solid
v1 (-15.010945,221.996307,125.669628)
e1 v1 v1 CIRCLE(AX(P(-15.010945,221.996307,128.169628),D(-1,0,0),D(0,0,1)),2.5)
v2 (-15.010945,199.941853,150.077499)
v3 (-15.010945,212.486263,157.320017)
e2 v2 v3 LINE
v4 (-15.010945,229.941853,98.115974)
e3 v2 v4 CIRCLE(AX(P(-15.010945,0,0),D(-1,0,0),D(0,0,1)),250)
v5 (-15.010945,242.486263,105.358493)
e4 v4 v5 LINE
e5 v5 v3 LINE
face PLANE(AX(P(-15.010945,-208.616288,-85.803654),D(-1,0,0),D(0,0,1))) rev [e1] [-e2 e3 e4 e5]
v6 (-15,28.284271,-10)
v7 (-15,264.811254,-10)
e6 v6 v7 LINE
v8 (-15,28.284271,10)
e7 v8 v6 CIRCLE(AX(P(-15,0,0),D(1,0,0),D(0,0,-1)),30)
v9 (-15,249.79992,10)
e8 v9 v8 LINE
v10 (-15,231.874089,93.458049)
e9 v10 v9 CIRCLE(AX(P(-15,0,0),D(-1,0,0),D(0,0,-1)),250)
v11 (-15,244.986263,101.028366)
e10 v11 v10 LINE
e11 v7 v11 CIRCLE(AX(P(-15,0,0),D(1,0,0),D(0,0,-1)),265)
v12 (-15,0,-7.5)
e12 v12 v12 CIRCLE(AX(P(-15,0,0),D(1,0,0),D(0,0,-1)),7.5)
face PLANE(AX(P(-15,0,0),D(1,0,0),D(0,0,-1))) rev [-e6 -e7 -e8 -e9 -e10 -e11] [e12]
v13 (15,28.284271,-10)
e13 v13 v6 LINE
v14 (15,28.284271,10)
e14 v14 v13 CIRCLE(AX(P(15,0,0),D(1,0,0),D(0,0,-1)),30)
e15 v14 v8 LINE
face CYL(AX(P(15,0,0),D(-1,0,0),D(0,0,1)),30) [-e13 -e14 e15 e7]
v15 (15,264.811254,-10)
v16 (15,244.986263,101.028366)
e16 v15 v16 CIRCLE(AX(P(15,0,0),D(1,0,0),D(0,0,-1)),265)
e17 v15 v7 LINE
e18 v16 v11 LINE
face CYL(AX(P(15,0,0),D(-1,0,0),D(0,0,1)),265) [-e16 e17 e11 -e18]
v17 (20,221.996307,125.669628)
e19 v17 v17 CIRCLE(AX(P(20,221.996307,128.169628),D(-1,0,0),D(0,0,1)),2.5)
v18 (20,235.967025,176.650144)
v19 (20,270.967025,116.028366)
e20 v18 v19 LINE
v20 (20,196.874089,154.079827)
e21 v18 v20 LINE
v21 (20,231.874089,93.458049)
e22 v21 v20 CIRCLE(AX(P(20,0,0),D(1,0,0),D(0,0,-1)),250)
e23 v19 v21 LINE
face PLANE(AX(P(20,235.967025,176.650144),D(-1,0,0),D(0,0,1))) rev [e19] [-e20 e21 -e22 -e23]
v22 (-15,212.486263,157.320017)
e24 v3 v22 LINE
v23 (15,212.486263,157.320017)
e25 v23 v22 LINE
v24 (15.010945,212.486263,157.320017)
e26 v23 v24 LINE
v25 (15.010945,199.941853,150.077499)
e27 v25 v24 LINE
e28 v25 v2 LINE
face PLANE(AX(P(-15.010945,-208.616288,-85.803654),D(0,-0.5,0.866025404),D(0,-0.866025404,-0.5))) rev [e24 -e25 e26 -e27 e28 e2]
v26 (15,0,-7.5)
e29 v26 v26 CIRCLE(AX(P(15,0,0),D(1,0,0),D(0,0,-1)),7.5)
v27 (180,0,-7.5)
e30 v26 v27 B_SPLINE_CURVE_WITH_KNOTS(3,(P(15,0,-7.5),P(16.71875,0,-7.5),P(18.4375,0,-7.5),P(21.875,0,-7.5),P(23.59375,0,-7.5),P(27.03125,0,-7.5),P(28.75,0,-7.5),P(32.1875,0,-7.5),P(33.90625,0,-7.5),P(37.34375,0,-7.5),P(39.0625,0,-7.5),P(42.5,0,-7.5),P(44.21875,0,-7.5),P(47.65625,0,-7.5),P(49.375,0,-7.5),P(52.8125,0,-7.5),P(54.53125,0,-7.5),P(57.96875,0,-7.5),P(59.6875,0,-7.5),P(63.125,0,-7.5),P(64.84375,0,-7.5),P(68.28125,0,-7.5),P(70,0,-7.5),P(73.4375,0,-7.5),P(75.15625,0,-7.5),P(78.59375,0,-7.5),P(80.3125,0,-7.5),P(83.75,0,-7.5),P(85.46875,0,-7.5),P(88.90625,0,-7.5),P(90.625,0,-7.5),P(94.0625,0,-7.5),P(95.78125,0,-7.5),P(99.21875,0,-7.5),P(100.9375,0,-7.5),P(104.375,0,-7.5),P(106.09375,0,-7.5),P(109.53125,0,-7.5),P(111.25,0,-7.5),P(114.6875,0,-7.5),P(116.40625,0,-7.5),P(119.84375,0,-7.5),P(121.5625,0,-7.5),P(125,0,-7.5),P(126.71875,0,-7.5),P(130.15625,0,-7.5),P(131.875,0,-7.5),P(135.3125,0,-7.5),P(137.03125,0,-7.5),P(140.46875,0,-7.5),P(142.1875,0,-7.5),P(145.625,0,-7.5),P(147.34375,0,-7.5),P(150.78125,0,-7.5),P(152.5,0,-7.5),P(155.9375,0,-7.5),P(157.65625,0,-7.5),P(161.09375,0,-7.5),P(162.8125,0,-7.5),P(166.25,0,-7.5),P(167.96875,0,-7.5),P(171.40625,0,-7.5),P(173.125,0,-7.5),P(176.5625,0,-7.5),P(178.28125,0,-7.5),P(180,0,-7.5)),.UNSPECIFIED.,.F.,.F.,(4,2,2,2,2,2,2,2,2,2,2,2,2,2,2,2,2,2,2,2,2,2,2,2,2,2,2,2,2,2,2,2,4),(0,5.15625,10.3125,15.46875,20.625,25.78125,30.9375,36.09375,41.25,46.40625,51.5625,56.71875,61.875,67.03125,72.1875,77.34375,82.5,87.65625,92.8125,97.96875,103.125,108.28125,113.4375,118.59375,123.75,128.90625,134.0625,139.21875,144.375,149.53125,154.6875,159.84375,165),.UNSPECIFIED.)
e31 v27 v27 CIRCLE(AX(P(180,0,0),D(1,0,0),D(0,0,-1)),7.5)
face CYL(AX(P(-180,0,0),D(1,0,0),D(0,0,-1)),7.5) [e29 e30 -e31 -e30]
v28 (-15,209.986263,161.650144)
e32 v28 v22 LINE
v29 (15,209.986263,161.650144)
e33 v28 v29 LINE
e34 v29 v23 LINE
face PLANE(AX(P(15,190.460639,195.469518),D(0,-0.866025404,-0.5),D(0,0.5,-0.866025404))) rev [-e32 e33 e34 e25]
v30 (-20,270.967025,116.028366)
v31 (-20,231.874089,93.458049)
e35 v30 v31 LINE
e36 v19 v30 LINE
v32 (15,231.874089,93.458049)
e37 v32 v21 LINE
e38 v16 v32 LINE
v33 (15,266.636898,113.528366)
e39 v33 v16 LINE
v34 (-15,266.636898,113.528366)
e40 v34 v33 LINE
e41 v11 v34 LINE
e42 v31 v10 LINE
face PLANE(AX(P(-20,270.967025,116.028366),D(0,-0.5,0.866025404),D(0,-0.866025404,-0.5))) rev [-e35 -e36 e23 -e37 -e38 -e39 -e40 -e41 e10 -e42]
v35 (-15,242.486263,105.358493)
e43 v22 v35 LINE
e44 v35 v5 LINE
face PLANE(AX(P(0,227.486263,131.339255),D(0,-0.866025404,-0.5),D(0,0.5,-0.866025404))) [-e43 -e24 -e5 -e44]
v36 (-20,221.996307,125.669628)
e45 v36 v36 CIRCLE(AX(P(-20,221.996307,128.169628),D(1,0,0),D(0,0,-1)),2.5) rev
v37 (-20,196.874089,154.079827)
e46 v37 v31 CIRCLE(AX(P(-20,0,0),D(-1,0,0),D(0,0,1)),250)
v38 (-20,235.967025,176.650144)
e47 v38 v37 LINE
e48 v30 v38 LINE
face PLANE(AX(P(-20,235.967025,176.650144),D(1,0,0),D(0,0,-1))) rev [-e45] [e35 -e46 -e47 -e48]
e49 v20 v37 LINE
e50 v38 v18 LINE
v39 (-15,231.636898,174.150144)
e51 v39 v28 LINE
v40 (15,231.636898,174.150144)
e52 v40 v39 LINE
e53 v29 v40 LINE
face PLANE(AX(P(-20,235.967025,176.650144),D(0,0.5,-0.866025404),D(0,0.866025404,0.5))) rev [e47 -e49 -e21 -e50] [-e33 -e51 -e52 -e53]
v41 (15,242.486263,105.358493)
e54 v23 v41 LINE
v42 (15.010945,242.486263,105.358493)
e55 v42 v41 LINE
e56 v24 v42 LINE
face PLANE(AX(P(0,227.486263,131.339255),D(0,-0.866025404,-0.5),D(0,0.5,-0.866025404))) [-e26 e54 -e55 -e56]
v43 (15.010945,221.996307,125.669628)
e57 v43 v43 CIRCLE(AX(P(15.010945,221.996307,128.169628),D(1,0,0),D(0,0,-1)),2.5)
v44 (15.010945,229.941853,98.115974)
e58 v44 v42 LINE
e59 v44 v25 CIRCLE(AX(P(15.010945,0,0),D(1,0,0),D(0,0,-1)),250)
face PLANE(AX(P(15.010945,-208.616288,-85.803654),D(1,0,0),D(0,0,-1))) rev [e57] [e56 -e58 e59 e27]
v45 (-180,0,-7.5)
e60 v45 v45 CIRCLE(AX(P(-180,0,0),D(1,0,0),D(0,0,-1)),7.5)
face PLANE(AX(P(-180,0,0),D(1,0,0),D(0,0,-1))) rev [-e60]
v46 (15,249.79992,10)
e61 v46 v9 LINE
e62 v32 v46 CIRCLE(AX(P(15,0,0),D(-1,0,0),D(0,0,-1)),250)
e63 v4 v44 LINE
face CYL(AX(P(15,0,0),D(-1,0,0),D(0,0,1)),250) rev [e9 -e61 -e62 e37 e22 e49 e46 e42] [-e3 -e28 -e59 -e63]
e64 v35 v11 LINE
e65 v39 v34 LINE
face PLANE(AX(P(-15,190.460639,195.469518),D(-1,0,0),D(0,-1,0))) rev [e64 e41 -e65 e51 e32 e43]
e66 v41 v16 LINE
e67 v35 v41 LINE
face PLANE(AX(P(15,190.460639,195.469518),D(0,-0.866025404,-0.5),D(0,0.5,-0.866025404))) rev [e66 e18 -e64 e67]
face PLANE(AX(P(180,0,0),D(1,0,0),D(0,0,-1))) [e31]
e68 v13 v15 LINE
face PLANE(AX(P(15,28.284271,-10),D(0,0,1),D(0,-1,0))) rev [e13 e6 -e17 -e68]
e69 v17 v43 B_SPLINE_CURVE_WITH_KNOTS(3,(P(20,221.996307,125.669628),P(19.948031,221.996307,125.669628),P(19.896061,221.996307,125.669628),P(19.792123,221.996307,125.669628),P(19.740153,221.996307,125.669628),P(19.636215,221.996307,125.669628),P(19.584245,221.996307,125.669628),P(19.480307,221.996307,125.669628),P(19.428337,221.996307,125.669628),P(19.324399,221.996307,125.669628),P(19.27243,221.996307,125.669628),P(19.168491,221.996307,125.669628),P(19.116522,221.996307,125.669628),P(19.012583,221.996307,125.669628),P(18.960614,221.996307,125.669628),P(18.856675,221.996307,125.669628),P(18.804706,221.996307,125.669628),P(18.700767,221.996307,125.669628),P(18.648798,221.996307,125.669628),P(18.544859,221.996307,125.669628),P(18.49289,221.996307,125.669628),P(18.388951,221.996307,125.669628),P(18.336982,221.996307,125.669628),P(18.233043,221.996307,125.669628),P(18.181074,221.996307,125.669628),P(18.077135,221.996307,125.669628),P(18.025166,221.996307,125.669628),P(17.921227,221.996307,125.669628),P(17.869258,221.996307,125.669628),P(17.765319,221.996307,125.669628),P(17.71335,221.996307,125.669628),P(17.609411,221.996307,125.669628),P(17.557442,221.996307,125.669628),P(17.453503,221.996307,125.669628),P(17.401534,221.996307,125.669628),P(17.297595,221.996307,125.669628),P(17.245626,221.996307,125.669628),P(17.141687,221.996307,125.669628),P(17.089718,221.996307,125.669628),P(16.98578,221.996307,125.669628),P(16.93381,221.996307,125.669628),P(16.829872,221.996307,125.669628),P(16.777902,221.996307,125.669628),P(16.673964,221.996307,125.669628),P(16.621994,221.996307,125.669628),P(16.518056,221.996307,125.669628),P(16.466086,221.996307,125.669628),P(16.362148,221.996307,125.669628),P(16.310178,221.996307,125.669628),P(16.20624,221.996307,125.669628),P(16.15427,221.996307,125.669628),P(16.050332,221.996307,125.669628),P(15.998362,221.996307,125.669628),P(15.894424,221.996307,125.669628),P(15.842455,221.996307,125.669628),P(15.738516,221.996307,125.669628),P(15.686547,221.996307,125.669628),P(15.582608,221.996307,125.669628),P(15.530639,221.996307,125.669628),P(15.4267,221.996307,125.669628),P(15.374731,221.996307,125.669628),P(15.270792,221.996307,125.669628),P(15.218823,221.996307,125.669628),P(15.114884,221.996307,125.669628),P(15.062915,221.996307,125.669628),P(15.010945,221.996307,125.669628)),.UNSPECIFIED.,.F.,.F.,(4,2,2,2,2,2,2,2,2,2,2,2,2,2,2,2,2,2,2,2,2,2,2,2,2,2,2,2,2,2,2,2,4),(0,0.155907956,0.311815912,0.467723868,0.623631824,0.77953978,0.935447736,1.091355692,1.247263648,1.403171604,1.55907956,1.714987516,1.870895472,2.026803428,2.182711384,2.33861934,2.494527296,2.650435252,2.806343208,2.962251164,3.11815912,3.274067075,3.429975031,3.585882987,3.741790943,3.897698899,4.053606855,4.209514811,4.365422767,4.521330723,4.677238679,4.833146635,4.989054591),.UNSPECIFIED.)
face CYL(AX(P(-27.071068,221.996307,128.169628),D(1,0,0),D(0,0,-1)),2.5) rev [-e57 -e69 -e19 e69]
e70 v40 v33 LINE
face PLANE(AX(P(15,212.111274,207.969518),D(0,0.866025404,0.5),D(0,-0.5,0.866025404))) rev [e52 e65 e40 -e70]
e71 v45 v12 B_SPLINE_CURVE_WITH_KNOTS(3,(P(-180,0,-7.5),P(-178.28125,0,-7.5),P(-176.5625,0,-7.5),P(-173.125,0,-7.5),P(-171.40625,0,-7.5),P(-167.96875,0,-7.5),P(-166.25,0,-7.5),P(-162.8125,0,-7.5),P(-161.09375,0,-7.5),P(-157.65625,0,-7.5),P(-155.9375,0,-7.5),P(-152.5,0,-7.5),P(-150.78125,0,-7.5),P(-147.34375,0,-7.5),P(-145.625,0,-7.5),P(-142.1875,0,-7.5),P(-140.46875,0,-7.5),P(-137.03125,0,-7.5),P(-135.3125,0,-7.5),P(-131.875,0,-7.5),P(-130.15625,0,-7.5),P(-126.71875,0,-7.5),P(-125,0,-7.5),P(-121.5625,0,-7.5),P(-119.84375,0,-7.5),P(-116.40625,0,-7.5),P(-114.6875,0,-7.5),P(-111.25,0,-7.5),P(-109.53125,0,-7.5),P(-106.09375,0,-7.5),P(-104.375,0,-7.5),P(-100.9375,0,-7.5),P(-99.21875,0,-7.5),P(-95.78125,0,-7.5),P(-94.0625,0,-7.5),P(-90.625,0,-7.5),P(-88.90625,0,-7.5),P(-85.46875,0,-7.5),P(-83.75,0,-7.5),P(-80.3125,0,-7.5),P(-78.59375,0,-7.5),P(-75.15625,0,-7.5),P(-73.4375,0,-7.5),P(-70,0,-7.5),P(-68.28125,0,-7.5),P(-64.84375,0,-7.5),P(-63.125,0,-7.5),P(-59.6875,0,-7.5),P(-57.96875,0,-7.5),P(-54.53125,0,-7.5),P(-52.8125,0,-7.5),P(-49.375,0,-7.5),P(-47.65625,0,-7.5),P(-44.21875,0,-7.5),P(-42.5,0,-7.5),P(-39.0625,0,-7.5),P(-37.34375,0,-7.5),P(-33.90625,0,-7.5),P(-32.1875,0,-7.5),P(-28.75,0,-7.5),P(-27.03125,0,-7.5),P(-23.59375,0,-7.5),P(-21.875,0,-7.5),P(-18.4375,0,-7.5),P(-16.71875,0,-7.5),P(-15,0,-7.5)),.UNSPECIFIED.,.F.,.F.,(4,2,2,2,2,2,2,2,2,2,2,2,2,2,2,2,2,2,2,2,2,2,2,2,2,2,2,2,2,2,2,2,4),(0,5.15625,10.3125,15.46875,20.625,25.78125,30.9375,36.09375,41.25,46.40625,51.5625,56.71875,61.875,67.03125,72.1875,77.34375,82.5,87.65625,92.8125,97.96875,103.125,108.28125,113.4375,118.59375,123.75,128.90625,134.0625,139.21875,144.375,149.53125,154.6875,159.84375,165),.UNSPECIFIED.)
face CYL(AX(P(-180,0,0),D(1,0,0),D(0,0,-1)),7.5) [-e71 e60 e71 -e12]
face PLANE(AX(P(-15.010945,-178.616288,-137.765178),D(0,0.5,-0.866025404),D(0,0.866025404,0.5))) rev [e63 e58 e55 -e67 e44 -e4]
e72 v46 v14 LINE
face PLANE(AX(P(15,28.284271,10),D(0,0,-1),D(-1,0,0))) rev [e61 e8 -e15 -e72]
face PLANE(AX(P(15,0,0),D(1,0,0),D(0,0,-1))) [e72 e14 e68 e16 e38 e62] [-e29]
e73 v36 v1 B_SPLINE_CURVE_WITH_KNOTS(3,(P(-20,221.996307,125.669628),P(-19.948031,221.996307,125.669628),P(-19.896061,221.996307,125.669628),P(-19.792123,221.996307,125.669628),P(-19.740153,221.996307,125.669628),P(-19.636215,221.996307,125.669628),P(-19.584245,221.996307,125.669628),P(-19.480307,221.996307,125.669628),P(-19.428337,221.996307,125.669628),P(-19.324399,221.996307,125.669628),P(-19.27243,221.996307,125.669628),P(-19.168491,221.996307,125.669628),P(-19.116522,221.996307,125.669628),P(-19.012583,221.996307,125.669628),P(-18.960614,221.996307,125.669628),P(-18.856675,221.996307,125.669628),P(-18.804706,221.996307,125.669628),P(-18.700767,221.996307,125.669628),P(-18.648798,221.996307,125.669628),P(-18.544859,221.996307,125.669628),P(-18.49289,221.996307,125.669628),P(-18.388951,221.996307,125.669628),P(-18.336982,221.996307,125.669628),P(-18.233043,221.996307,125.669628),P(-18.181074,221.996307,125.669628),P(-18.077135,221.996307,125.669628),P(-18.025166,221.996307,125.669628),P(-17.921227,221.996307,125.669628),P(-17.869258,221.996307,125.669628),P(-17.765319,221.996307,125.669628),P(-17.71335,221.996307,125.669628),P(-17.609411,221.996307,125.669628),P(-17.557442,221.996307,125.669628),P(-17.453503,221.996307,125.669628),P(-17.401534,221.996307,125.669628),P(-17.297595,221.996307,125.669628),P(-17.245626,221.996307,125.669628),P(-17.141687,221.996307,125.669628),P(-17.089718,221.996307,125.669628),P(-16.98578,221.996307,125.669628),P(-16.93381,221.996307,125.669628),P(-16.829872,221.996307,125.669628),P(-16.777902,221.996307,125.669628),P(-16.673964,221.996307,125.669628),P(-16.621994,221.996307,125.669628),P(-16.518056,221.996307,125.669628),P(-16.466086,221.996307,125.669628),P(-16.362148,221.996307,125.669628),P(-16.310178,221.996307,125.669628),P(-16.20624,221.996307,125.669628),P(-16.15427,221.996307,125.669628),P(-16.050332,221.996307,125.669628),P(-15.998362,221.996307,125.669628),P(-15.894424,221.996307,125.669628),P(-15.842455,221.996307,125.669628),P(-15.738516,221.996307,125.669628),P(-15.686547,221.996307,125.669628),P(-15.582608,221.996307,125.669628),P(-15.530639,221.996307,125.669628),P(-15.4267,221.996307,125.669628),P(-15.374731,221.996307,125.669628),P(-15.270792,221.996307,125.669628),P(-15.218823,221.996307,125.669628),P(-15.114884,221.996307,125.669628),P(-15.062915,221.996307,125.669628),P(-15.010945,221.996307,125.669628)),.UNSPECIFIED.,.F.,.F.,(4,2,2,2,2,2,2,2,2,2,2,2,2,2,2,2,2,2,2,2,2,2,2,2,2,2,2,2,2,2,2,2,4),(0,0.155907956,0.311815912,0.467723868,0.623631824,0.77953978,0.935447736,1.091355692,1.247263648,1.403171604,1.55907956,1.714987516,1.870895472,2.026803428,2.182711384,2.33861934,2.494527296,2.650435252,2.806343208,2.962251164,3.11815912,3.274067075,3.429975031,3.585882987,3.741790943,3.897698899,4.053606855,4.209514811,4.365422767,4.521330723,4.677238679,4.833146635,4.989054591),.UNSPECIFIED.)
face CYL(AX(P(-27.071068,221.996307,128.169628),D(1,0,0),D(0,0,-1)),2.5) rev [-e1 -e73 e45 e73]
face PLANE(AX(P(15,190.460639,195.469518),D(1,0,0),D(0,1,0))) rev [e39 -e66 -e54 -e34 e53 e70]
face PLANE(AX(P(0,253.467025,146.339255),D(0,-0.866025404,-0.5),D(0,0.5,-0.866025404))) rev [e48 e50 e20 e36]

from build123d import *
from build123d.topology import SkipClean

# Parameters (mm, degrees)
BOSS_EXTRUDE1_DEPTH             = 15
BOSS_EXTRUDE1_DEPTH_BACK        = 15
BOSS_EXTRUDE3_REACH             = 306.228
BOSS_EXTRUDE3_END_RADIUS        = 250
SKETCH5_W                       = 40
SKETCH5_H                       = 70
BOSS_EXTRUDE3_DIRECTION_2_DEPTH = 30
SKETCH6_W                       = 30
SKETCH6_H                       = 25
CUT_EXTRUDE2_DEPTH              = 70
CUT_EXTRUDE3_REACH              = 306.515
CUT_EXTRUDE3_END_RADIUS         = 250
SKETCH7_W                       = 30.021890818
SKETCH7_H                       = 60
CUT_EXTRUDE4_REACH              = 327.352
SKETCH8_R                       = 2.5
CUT_EXTRUDE4_DIRECTION_2_REACH  = 327.352
BOSS_EXTRUDE4_DEPTH             = 180
BOSS_EXTRUDE4_DEPTH_BACK        = 180
SKETCH11_R                      = 7.5


with BuildPart() as part:
    # Sketch1 → Boss-Extrude1 (new, two sides: drawn at the far end of the back side and taken through both)
    with BuildSketch(Plane(origin=(0, 0, 0), x_dir=(0, 0, -1), z_dir=(1, 0, 0)).offset(-BOSS_EXTRUDE1_DEPTH_BACK)):
        with BuildLine():
            Line((10, 28.284271247), (10, 264.811253537))
            ThreePointArc((10, 264.811253537), (-46.581095136, 260.873918926), (-101.028366233, 244.986263322))
            Line((-101.028366233, 244.986263322), (-161.650144498, 209.986263322))
            Line((-161.650144498, 209.986263322), (-152.500136319, 198.100248417))
            ThreePointArc((-152.500136319, 198.100248417), (-85.263049352, 235.011089984), (-10, 249.799919936))
            Line((-10, 249.799919936), (-10, 28.284271247))
            ThreePointArc((-10, 28.284271247), (0, -30), (10, 28.284271247))
        make_face()
    extrude(amount=BOSS_EXTRUDE1_DEPTH + BOSS_EXTRUDE1_DEPTH_BACK)

    # Boss-Extrude3: up to this cylinder (the profile starts outside it)
    with SkipClean():  # the faces are left unmerged after this step: merging them gives an invalid solid
        boss_extrude3_end = Plane(origin=(0, 0, 0), z_dir=(-1, 0, 0)) * Cylinder(BOSS_EXTRUDE3_END_RADIUS, 1113.456, mode=Mode.PRIVATE)
        # Sketch5 → Boss-Extrude3 (add, up to the surface)
        with BuildSketch(Plane(origin=(0, 227.486263322, 131.339255366), x_dir=(1, 0, 0), z_dir=(0, 0.8660254037844353, 0.5000000000000059)), mode=Mode.PRIVATE) as boss_extrude3_sk1:
            Rectangle(SKETCH5_W, SKETCH5_H)
        boss_extrude3_tool1 = extrude(boss_extrude3_sk1.sketch, amount=-BOSS_EXTRUDE3_REACH, mode=Mode.PRIVATE) - boss_extrude3_end
        add(boss_extrude3_tool1.solids().sort_by_distance((0, 227.486263, 131.339255))[0])

    # Sketch5 → Boss-Extrude3 direction 2 (add)
    with SkipClean():  # the faces are left unmerged after this step: merging them gives an invalid solid
        with BuildSketch(Plane(origin=(0, 227.486263322, 131.339255366), x_dir=(1, 0, 0), z_dir=(0, 0.8660254037844353, 0.5000000000000059))):
            Rectangle(SKETCH5_W, SKETCH5_H)
        extrude(amount=BOSS_EXTRUDE3_DIRECTION_2_DEPTH)

    # Sketch6 → Cut-Extrude2 (cut)
    with SkipClean():  # the faces are left unmerged after this step: merging them gives an invalid solid
        with BuildSketch(Plane(origin=(0, 17.5, -30.310889132), x_dir=(-1, 0, 0), z_dir=(0, 0.5000000000000059, -0.8660254037844353))):
            with Locations((0, 275.178510731)):
                Rectangle(SKETCH6_W, SKETCH6_H)
        extrude(amount=-CUT_EXTRUDE2_DEPTH, mode=Mode.SUBTRACT)

    # Cut-Extrude3: up to this cylinder (the profile starts outside it)
    cut_extrude3_end = Plane(origin=(0, 0, 0), z_dir=(-1, 0, 0)) * Cylinder(CUT_EXTRUDE3_END_RADIUS, 1114.03, mode=Mode.PRIVATE)
    # Sketch7 → Cut-Extrude3 (cut, up to the surface)
    with BuildSketch(Plane(origin=(0, 227.486263322, 131.339255366), x_dir=(1, 0, 0), z_dir=(0, 0.8660254037844353, 0.5000000000000059)), mode=Mode.PRIVATE) as cut_extrude3_sk1:
        Rectangle(SKETCH7_W, SKETCH7_H)
    cut_extrude3_tool1 = extrude(cut_extrude3_sk1.sketch, amount=-CUT_EXTRUDE3_REACH, mode=Mode.PRIVATE) - cut_extrude3_end
    add(cut_extrude3_tool1.solids().sort_by_distance((0, 227.486263, 131.339255))[0], mode=Mode.SUBTRACT)

    # Cut-Extrude4: up to this face of the body (flat: up to its plane)
    cut_extrude4_end = Plane(part.part.faces().sort_by_distance((-20, 234.626657577, 135.461763911))[0])
    # Sketch8 → Cut-Extrude4 (cut, up to the picked face)
    with BuildSketch(Plane(origin=(-15.010945409, 0, 0), x_dir=(0, 0, -1), z_dir=(1, 0, 0)), mode=Mode.PRIVATE) as cut_extrude4_sk1:
        with Locations((-128.169627683, 221.996307134)):
            Circle(SKETCH8_R)
    cut_extrude4_tool1 = split(extrude(cut_extrude4_sk1.sketch, amount=-CUT_EXTRUDE4_REACH, mode=Mode.PRIVATE), bisect_by=cut_extrude4_end, keep=Keep.BOTH, mode=Mode.PRIVATE)
    add(cut_extrude4_tool1.solids().sort_by(Axis((-15.010945, 221.996307, 128.169628), (-1, 0, 0)))[0], mode=Mode.SUBTRACT)

    # Cut-Extrude4 direction 2: up to this face of the body (flat: up to its plane)
    cut_extrude4_direction_2_end = Plane(part.part.faces().sort_by_distance((20, 234.626657577, 135.461763911))[0])
    # Sketch8 → Cut-Extrude4 direction 2 (cut, up to the picked face)
    with BuildSketch(Plane(origin=(-15.010945409, 0, 0), x_dir=(0, 0, -1), z_dir=(1, 0, 0)), mode=Mode.PRIVATE) as cut_extrude4_direction_2_sk1:
        with Locations((-128.169627683, 221.996307134)):
            Circle(SKETCH8_R)
    cut_extrude4_direction_2_tool1 = split(extrude(cut_extrude4_direction_2_sk1.sketch, amount=CUT_EXTRUDE4_DIRECTION_2_REACH, mode=Mode.PRIVATE), bisect_by=cut_extrude4_direction_2_end, keep=Keep.BOTH, mode=Mode.PRIVATE)
    add(cut_extrude4_direction_2_tool1.solids().sort_by(Axis((-15.010945, 221.996307, 128.169628), (1, 0, 0)))[0], mode=Mode.SUBTRACT)

    # Sketch11 → Boss-Extrude4 (add, two sides: drawn at the far end of the back side and taken through both)
    with BuildSketch(Plane(origin=(0, 0, 0), x_dir=(0, 0, -1), z_dir=(1, 0, 0)).offset(-BOSS_EXTRUDE4_DEPTH_BACK)):
        Circle(SKETCH11_R)
    extrude(amount=BOSS_EXTRUDE4_DEPTH + BOSS_EXTRUDE4_DEPTH_BACK)


solid = part.part
